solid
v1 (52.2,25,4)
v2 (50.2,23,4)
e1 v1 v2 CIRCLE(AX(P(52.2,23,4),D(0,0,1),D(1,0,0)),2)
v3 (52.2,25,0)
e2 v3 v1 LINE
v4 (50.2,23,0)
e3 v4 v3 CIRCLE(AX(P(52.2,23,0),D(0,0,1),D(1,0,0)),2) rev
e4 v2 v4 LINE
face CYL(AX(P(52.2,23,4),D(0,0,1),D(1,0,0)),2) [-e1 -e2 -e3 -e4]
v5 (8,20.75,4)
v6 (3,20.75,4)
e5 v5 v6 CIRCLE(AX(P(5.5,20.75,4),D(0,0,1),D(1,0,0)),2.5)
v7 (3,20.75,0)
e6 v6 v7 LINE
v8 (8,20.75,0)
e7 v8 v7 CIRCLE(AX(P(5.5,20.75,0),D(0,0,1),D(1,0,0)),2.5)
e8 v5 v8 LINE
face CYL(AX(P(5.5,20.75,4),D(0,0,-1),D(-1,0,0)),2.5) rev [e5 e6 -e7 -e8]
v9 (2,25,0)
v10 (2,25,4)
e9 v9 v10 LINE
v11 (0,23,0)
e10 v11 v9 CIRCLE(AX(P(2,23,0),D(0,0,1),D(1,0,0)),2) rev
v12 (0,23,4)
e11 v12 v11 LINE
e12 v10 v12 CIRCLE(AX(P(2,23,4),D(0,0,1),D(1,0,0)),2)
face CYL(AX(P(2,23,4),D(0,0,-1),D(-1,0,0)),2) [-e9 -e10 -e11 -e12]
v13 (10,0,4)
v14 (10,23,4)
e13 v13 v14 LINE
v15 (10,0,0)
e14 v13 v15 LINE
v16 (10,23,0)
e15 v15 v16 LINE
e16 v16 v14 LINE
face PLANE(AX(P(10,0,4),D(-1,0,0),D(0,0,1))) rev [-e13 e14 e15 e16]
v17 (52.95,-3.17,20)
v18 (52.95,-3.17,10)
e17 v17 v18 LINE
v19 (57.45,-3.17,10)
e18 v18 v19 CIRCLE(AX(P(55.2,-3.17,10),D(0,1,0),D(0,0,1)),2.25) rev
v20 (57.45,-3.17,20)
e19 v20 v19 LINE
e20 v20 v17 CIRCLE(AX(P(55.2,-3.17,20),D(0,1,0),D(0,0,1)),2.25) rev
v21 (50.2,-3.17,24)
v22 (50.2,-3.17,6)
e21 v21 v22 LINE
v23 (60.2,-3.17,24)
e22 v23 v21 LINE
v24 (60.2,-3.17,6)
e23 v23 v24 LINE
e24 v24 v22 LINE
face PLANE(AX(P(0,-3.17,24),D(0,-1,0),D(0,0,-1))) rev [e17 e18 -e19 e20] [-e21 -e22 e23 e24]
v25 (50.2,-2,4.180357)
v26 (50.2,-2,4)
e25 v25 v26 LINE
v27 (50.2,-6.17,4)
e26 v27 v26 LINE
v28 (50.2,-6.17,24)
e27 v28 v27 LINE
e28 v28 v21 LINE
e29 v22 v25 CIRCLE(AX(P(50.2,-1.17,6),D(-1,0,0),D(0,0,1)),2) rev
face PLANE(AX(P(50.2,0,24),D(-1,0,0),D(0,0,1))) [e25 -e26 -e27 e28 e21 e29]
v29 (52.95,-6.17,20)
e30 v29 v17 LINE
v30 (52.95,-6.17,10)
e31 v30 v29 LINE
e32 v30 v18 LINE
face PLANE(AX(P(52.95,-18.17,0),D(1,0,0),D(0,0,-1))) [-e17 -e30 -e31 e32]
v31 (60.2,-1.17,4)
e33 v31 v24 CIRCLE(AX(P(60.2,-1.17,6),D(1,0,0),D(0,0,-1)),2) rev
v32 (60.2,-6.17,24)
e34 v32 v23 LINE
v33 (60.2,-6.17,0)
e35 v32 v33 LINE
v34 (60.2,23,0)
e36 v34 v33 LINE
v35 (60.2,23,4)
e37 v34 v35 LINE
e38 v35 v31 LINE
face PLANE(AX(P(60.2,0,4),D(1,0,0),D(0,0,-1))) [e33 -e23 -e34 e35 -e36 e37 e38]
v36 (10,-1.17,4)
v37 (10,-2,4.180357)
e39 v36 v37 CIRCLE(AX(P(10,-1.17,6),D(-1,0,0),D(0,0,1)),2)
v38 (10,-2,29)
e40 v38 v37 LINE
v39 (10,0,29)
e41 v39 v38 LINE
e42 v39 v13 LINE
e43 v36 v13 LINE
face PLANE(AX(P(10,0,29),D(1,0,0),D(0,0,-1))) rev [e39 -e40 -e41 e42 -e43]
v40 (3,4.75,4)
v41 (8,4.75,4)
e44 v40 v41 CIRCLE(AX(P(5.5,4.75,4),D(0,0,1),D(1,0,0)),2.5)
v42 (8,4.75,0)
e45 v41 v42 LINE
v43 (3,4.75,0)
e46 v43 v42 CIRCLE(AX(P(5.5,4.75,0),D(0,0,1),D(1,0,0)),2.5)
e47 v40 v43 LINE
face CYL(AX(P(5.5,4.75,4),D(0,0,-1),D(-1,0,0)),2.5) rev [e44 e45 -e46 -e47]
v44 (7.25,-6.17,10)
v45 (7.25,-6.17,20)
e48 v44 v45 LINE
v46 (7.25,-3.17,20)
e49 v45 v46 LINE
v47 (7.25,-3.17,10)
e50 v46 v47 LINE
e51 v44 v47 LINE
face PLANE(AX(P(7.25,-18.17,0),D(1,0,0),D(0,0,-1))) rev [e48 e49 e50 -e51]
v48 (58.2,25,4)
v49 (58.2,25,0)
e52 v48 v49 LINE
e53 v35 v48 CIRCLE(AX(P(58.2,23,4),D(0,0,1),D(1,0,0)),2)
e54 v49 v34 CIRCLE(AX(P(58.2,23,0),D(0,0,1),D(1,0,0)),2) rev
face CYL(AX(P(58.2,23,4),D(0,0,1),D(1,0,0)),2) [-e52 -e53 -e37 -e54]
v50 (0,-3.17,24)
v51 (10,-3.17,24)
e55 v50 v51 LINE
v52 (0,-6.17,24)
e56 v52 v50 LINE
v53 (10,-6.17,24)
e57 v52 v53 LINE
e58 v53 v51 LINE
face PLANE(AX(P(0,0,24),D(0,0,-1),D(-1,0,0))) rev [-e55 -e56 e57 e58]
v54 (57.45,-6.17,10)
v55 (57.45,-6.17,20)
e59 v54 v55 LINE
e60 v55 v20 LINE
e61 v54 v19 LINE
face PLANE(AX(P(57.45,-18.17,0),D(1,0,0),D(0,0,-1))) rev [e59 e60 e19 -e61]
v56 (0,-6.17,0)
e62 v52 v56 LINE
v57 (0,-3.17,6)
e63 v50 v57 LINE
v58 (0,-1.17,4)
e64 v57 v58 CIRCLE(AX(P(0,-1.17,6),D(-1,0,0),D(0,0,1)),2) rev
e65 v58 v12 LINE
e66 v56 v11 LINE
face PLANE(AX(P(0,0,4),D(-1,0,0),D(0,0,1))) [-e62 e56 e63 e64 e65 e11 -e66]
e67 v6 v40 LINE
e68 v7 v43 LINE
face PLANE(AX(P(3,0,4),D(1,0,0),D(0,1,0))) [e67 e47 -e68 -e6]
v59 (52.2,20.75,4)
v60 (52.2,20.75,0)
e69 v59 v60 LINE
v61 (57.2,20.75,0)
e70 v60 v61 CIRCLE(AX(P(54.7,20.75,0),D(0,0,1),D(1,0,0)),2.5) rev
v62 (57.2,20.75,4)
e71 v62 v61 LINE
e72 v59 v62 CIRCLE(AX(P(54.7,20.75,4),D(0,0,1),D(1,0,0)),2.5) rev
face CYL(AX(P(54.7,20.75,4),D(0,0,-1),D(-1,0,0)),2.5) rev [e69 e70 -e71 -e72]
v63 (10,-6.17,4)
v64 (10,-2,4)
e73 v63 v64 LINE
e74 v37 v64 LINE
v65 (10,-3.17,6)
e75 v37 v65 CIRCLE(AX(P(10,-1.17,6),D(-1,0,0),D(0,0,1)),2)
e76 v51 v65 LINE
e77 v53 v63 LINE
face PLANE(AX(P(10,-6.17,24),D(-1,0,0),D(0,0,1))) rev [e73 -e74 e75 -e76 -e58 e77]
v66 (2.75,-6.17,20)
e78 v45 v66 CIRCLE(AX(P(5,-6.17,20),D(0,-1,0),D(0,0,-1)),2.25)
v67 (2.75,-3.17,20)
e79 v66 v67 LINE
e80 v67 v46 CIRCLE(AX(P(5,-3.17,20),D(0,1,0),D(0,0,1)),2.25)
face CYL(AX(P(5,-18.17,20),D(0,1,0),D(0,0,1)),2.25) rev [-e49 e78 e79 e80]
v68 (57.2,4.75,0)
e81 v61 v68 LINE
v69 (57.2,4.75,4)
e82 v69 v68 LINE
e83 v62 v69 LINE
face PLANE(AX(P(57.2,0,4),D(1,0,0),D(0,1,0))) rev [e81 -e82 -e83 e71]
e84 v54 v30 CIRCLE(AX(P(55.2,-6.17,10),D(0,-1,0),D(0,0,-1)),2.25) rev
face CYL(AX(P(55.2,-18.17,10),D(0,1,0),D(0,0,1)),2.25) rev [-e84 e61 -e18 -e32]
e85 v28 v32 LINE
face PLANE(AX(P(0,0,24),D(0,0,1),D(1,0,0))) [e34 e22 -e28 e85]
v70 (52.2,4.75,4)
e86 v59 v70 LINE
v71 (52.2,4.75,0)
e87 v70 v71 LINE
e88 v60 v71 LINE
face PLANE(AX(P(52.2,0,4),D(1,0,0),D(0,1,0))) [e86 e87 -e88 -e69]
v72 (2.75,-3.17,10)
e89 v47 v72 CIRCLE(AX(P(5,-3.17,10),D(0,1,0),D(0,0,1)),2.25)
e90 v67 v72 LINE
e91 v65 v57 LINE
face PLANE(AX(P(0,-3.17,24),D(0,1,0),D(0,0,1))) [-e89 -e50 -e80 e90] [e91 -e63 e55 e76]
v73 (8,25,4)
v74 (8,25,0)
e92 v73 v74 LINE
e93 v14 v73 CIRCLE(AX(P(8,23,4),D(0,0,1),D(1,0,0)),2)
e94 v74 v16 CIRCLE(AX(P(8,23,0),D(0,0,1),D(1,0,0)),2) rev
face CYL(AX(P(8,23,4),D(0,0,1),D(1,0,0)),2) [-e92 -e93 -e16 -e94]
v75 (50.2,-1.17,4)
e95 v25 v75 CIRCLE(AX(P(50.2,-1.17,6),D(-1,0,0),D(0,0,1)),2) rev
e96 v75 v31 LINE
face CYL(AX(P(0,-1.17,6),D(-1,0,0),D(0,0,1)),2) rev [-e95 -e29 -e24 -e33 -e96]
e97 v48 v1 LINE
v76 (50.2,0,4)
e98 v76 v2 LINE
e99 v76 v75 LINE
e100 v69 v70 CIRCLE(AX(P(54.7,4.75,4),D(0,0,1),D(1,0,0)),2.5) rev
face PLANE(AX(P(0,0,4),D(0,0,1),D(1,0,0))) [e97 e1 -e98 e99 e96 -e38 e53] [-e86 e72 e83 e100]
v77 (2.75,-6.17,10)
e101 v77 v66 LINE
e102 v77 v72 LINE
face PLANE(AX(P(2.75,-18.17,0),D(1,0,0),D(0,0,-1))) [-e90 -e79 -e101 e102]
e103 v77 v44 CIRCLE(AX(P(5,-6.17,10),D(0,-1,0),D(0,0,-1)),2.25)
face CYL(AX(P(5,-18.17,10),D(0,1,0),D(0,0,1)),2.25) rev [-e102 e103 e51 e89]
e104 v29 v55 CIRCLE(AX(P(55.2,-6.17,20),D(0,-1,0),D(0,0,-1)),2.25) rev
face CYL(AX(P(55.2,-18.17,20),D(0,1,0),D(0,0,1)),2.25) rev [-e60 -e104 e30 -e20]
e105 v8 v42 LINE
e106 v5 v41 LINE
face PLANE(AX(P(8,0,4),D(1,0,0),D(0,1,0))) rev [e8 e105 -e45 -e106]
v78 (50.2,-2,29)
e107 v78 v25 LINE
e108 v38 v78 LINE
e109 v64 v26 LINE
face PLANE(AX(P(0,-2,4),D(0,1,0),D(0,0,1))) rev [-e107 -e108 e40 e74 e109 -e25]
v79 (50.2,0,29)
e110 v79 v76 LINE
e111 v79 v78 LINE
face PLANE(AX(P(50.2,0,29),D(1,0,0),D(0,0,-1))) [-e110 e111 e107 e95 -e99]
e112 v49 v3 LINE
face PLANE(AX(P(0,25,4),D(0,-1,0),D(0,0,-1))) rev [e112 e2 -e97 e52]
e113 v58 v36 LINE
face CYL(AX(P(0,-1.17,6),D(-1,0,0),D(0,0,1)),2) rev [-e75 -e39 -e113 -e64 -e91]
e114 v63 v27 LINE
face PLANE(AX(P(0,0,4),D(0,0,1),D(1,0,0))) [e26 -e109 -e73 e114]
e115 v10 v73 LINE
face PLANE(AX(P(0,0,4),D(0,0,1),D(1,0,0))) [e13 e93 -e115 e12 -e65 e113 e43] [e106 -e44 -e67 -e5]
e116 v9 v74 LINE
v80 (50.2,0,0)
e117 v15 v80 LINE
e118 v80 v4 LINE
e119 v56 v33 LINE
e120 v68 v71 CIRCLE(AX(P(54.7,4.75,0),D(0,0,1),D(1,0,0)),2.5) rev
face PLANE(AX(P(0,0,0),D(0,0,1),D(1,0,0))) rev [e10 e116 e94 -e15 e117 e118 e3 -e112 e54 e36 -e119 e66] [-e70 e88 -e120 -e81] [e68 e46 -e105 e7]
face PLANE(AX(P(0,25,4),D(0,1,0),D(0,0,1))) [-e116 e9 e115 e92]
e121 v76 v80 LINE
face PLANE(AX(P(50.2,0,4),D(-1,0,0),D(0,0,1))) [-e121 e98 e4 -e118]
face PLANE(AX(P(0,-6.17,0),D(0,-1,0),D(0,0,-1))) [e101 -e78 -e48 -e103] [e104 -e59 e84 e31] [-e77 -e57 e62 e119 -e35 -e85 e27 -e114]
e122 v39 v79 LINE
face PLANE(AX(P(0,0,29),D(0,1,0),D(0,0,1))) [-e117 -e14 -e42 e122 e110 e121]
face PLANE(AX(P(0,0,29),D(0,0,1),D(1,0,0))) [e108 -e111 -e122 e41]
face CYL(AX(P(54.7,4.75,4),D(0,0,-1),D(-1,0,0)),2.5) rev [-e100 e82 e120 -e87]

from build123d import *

# Parameters (mm, degrees)
SKETCH1_W             = 10
SKETCH1_H             = 25
BOSS_EXTRUDE1_DEPTH   = 4
BOSS_EXTRUDE1_2_DEPTH = 4
SKETCH1_3_W           = 40.2
SKETCH1_3_H           = 2
BOSS_EXTRUDE2_DEPTH   = 29
SKETCH1_4_W           = 10
SKETCH1_4_H           = 2
BOSS_EXTRUDE3_DEPTH   = 4
FILLET2_R             = 2
SKETCH2_W             = 60.2
SKETCH2_H             = 4
BOSS_EXTRUDE5_DEPTH   = 4.17
SKETCH3_W             = 10
SKETCH3_H             = 3
BOSS_EXTRUDE6_DEPTH   = 20
FILLET3_R             = 2
CUT_EXTRUDE1_DEPTH    = 15


with BuildPart() as part:
    # Sketch1 → Boss-Extrude1 (new body)
    with BuildSketch(Plane.XY):
        with Locations((5, 12.5)):
            Rectangle(SKETCH1_W, SKETCH1_H)
        with BuildLine():
            ThreePointArc((3, 4.75), (5.5, 2.25), (8, 4.75))
            Line((8, 4.75), (8, 20.75))
            ThreePointArc((8, 20.75), (5.5, 23.25), (3, 20.75))
            Line((3, 20.75), (3, 4.75))
        make_face(mode=Mode.SUBTRACT)
    extrude(amount=BOSS_EXTRUDE1_DEPTH)



with BuildPart() as body_2:
    # Sketch1 → Boss-Extrude1 2 (new body)
    with BuildSketch(Plane.XY):
        with Locations((55.2, 12.5)):
            Rectangle(SKETCH1_W, SKETCH1_H)
        with BuildLine():
            Line((57.2, 20.75), (57.2, 4.75))
            ThreePointArc((57.2, 4.75), (54.7, 2.25), (52.2, 4.75))
            Line((52.2, 4.75), (52.2, 20.75))
            ThreePointArc((52.2, 20.75), (54.7, 23.25), (57.2, 20.75))
        make_face(mode=Mode.SUBTRACT)
    extrude(amount=BOSS_EXTRUDE1_2_DEPTH)


with BuildPart() as body_3:
    # Sketch1<3> → Boss-Extrude2 (new body)
    with BuildSketch(Plane.XY):
        with Locations((30.1, -1)):
            Rectangle(SKETCH1_3_W, SKETCH1_3_H)
    extrude(amount=BOSS_EXTRUDE2_DEPTH)


with BuildPart() as part_1:
    add(part.part)

    add(body_2.part)  # Boss-Extrude3 merges body 2

    add(body_3.part)  # Boss-Extrude3 merges body 3
    # Sketch1<4> → Boss-Extrude3 (add)
    with BuildSketch(Plane.XY):
        with Locations((5, -1)):
            Rectangle(SKETCH1_4_W, SKETCH1_4_H)
        with Locations((55.2, -1)):
            Rectangle(SKETCH1_4_W, SKETCH1_4_H)
    extrude(amount=BOSS_EXTRUDE3_DEPTH)

    # Fillet2
    fillet2_edges = [part_1.edges().sort_by_distance(p)[0] for p in [
        (0, 25, 2),
        (10, 25, 2),
        (60.2, 25, 2),
        (50.2, 25, 2),
    ]]
    fillet(fillet2_edges, radius=FILLET2_R)

    # Sketch2 → Boss-Extrude5 (add)
    with BuildSketch(Plane.XZ.offset(2)):
        with Locations((30.1, 2)):
            Rectangle(SKETCH2_W, SKETCH2_H)
    extrude(amount=BOSS_EXTRUDE5_DEPTH)

    # Sketch3 → Boss-Extrude6 (add)
    with BuildSketch(Plane.XY.offset(4)):
        with Locations((5, -4.67)):
            Rectangle(SKETCH3_W, SKETCH3_H)
        with Locations((55.2, -4.67)):
            Rectangle(SKETCH3_W, SKETCH3_H)
    extrude(amount=BOSS_EXTRUDE6_DEPTH)

    # Fillet3
    # the kernel refuses this fillet: 2 mm, written as the material it adds along each edge
    with BuildSketch(Plane(origin=(60.2, -3.17, 4), x_dir=(0, 1, 0), z_dir=(-1, 0, 0)), Plane(origin=(10, -3.17, 4), x_dir=(0, 1, 0), z_dir=(-1, 0, 0))) as fillet3_piece_1:
        with BuildLine():
            CenterArc((FILLET3_R, -FILLET3_R), FILLET3_R, 90, 90)
            Line((0, -FILLET3_R), (0, 0))
            Line((0, 0), (FILLET3_R, 0))
        make_face()
    extrude(amount=10)

    # Sketch4 → Cut-Extrude1 (cut)
    with BuildSketch(Plane(origin=(0, -3.17, 0), x_dir=(1, 0, 0), z_dir=(0, 1, 0))):
        with BuildLine():
            Line((7.25, -20), (7.25, -10))
            ThreePointArc((7.25, -10), (5, -7.75), (2.75, -10))
            Line((2.75, -10), (2.75, -20))
            ThreePointArc((2.75, -20), (5, -22.25), (7.25, -20))
        make_face()
        with BuildLine():
            ThreePointArc((52.95, -10), (55.2, -7.75), (57.45, -10))
            Line((57.45, -10), (57.45, -20))
            ThreePointArc((57.45, -20), (55.2, -22.25), (52.95, -20))
            Line((52.95, -20), (52.95, -10))
        make_face()
    extrude(amount=-CUT_EXTRUDE1_DEPTH, mode=Mode.SUBTRACT)


solid = part_1.part
